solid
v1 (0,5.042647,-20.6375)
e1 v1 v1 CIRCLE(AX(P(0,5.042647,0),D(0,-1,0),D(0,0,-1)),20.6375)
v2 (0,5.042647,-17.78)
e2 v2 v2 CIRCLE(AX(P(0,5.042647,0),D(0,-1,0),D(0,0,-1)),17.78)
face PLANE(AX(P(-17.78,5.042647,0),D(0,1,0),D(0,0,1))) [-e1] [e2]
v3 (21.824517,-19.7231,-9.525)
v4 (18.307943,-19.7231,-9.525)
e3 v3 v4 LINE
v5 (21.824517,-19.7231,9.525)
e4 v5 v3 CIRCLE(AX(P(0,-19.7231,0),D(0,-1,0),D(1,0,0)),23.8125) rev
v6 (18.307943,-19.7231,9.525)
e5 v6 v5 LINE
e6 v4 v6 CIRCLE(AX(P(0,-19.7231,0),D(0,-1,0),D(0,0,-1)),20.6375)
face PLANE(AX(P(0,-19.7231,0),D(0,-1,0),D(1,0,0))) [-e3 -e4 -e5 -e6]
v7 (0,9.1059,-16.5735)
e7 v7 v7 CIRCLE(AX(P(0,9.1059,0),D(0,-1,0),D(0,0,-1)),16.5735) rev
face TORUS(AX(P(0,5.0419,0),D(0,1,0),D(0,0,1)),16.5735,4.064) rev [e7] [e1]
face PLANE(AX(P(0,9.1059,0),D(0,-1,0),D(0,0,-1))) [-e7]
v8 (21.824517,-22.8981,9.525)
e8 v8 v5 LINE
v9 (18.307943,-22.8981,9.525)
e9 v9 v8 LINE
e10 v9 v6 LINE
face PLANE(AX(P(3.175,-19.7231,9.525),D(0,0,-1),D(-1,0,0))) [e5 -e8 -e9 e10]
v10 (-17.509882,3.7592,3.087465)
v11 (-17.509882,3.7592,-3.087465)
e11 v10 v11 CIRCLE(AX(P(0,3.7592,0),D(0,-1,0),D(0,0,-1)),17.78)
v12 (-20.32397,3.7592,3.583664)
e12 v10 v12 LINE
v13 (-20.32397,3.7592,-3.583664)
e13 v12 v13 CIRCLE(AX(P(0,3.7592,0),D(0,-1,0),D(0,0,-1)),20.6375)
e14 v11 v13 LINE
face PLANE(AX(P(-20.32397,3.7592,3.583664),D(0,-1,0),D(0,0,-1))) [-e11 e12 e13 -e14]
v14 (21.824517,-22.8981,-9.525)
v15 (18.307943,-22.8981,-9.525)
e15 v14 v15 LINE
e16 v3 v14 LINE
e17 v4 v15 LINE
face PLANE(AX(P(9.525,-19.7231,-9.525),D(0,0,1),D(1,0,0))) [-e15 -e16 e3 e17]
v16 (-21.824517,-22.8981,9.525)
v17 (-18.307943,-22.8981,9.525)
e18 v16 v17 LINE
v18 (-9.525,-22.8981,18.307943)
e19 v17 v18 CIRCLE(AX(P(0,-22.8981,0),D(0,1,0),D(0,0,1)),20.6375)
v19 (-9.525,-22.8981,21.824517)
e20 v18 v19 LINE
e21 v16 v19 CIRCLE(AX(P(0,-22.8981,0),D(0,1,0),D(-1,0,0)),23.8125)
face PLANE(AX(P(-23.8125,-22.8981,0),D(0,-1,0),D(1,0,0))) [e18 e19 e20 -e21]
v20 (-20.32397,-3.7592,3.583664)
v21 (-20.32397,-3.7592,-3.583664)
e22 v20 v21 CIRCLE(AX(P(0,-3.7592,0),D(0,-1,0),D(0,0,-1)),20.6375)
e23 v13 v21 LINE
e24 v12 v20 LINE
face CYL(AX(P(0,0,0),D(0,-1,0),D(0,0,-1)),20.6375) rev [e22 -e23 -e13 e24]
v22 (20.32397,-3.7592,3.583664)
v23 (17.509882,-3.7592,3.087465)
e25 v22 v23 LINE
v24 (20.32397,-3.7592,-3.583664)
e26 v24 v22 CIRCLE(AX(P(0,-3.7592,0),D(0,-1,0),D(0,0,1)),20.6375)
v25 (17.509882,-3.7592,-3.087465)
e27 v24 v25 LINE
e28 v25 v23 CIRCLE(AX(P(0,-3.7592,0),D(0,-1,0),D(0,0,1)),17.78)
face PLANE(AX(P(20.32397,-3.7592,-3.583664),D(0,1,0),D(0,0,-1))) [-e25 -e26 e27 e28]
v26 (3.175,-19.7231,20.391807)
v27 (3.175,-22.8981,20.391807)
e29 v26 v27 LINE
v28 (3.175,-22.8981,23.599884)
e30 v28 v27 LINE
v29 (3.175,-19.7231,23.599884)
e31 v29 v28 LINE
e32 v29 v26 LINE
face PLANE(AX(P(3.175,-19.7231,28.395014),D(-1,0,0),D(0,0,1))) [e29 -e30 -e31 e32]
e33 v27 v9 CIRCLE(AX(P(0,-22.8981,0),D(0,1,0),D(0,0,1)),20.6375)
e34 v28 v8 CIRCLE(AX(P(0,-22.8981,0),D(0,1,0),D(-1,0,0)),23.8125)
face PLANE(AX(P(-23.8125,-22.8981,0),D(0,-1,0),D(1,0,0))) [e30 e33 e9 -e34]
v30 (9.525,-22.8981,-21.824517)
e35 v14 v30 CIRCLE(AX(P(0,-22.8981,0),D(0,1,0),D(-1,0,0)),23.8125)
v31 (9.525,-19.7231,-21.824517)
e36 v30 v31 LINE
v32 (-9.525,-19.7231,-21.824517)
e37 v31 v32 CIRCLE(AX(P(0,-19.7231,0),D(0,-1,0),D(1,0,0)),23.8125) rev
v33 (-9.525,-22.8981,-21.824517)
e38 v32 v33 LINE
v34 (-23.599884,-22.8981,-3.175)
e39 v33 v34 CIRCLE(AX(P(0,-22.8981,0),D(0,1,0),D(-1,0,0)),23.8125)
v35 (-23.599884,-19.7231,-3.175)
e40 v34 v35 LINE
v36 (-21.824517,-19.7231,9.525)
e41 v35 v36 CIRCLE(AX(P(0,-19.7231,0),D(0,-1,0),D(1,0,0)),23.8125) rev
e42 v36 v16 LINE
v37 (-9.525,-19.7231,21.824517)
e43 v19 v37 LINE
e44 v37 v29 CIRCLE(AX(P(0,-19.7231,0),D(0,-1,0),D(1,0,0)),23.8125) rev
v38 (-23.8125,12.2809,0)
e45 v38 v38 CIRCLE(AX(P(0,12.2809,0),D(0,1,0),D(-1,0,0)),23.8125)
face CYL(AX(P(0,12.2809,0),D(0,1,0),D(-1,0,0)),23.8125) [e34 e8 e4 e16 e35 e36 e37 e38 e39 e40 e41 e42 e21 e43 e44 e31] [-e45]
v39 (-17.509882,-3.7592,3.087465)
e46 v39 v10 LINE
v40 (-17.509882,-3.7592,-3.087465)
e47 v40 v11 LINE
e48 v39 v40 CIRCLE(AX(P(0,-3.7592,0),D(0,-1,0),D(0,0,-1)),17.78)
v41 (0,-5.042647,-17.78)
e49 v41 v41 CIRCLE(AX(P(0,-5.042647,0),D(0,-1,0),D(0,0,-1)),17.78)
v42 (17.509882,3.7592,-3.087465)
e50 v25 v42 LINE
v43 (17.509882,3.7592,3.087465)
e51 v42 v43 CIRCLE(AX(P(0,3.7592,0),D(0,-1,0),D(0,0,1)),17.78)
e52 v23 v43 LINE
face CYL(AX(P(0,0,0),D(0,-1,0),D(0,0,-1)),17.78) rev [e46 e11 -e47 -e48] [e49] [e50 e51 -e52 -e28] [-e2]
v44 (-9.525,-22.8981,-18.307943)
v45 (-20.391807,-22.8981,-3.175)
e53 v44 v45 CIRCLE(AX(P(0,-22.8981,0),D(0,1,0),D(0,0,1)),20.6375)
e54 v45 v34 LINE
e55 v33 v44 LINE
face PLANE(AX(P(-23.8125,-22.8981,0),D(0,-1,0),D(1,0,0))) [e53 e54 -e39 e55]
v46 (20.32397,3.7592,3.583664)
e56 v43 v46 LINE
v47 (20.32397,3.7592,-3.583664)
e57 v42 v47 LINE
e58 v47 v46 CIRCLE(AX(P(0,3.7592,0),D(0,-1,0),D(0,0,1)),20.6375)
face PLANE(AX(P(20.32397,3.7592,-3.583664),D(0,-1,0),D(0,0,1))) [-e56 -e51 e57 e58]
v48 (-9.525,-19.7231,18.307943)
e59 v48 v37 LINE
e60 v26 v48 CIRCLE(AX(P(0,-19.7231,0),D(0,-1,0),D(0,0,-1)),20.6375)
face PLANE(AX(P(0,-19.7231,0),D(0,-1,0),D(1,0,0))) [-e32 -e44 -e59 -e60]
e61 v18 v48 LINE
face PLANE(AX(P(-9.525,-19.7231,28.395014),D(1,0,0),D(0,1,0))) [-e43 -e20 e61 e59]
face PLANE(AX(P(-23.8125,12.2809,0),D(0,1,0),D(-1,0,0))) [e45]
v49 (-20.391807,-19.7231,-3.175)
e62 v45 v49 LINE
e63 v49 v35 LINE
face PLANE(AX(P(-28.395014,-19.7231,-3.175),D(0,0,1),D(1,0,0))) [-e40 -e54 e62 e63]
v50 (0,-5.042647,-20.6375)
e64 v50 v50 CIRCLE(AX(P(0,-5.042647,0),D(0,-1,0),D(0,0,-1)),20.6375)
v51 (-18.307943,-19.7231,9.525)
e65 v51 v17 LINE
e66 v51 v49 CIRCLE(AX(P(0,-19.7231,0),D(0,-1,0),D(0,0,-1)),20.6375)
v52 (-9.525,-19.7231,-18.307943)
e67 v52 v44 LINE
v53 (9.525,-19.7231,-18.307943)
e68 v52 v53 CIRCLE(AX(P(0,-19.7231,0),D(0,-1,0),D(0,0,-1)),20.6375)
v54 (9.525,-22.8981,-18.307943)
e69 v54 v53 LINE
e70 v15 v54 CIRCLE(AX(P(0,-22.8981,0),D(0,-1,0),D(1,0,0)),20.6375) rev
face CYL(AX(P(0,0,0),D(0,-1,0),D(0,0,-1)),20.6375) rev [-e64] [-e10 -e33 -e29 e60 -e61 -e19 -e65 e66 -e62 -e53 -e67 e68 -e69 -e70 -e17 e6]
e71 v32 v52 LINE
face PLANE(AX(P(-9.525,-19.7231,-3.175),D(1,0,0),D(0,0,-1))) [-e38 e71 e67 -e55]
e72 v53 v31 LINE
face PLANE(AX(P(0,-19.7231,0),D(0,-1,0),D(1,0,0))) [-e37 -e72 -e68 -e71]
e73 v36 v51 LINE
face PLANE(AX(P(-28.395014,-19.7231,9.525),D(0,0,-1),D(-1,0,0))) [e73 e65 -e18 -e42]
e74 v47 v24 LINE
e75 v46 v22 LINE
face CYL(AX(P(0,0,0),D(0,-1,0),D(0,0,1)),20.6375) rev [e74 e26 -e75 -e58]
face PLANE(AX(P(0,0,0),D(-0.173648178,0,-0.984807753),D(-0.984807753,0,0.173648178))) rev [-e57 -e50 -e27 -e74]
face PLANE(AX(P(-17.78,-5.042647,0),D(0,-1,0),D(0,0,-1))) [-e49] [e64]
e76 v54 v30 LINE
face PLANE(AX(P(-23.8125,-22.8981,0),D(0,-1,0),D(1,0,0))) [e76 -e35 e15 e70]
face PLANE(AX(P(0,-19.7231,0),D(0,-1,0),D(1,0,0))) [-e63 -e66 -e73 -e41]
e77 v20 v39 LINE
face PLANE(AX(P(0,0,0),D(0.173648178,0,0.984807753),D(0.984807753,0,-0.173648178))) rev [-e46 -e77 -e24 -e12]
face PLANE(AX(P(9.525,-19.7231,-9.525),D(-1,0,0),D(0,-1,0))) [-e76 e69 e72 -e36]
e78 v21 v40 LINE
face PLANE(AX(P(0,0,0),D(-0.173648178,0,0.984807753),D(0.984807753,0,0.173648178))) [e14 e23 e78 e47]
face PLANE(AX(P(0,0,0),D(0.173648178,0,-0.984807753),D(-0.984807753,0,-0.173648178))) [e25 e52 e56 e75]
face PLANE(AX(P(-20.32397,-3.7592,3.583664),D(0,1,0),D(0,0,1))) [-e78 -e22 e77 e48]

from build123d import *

# Parameters (mm, degrees)
FILLET1_R            = 4.064
SKETCH10_W           = 2.857500069
SKETCH10_H           = 7.5184
REVOLVE3_ANGLE       = 20
CUT_EXTRUDE1_START   = 1.27
CUT_EXTRUDE1_DEPTH   = 4.9784
CIRPATTERN4_COUNT    = 2
FILLET8_R            = 1.27
FILLET9_R            = 1.27
SKETCH13_W           = 23.8125
SKETCH13_H           = 35.179
SKETCH14_OUTSIDE_W   = 64.822
SKETCH14_OUTSIDE_H   = 64.822
SKETCH14_OUTSIDE_W_2 = 18.870013955
SKETCH14_OUTSIDE_H_2 = 18.870013955
SKETCH14_OUTSIDE_W_3 = 25.220013955
SKETCH14_OUTSIDE_H_3 = 25.220013955
CUT_EXTRUDE2_DEPTH   = 3.175


with BuildPart() as part:
    # Sketch1 → Revolve1 (revolve)
    with BuildSketch(Plane.XY, mode=Mode.PRIVATE) as revolve1_sk:
        Polygon((0, 9.1059), (-20.6375, 9.1059), (-20.6375, 5.042647059), (-17.78, 5.042647059), (-17.78, -5.042647059), (-20.6375, -5.042647059), (-20.6375, -19.7231), (-16.51, -19.7231), (-16.51, -15.5956), (-18.0975, -15.5956), (-18.0975, -13.3096), (-16.51, -13.3096), (-16.51, 6.7564), (-3.8481, 6.7564), (-3.0861, 7.5184), (0, 7.5184), align=None)
    revolve(revolve1_sk.sketch.rotate(Axis((0, 0, 0), (0, 1, 0)), 270), axis=Axis((0, 0, 0), (0, 1, 0)))

    # Fillet1
    # the kernel refuses this fillet: 4.064 mm, written as the material it takes off along each edge
    with BuildSketch(Plane(origin=(0, 9.1059, 0), x_dir=(0, 0, -1), z_dir=(1, 0, 0))) as fillet1_piece_1:
        with BuildLine():
            CenterArc((16.573500069, -4.064), FILLET1_R, 0.010532312, 89.989467688)
            Line((20.6375, -4.063252941), (20.718779999, -4.063238))
            Line((20.718779999, -4.063238), (20.71878, 0))
            Line((20.71878, 0), (20.6375, 0.08128))
            Line((20.6375, 0.08128), (16.573500069, 0.08128))
            Line((16.573500069, 0.08128), (16.573500069, 0))
        make_face()
    revolve(axis=Axis((0, 9.1059, 0), (0, 1, 0)), mode=Mode.SUBTRACT)

    # Sketch10 → Revolve3 (revolve, symmetric)
    with BuildSketch(Plane.XY) as revolve3_sk:
        with Locations((-19.208750034, 0)):
            Rectangle(SKETCH10_W, SKETCH10_H)
    revolve3 = revolve(axis=Axis((0, 0, 0), (0, 1, 0)), revolution_arc=REVOLVE3_ANGLE / 2)
    revolve3 = revolve3 + revolve(revolve3_sk.sketch, axis=Axis((0, 0, 0), (0, -1, 0)), revolution_arc=REVOLVE3_ANGLE / 2)

    # Sketch12 → Cut-Extrude1 (cut)
    with BuildSketch(Plane(origin=(0, -3.7592, 0), x_dir=(1, 0, 0), z_dir=(0, 1, 0)).offset(CUT_EXTRUDE1_START)):
        with BuildLine():
            Line((-7.313638514, 0), (-17.215440903, 1.745954919))
            ThreePointArc((-17.215440903, 1.745954919), (-17.30375, 0), (-17.215440903, -1.745954919))
            Line((-17.215440903, -1.745954919), (-7.313638514, 0))
        make_face()
    cut_extrude1 = extrude(amount=CUT_EXTRUDE1_DEPTH, mode=Mode.SUBTRACT)

    # CirPattern4: Revolve3, Cut-Extrude1 ×2 about axis
    cirpattern4_axis = Axis((0, 0, 0), (0, 1, 0))
    add([revolve3.rotate(cirpattern4_axis, i * 360 / CIRPATTERN4_COUNT) for i in range(1, CIRPATTERN4_COUNT)])
    add([cut_extrude1.rotate(cirpattern4_axis, i * 360 / CIRPATTERN4_COUNT) for i in range(1, CIRPATTERN4_COUNT)], mode=Mode.SUBTRACT)

    # Fillet8
    # the kernel refuses this fillet: 1.27 mm, written as the material it takes off along each edge
    with BuildSketch(Plane(origin=(-16.431533746, -2.4892, -1.607730937), x_dir=(0.1324793231915166, 0, -0.9911857691304479), z_dir=(0, 1, 0)), Plane(origin=(16.431533746, -2.4892, 1.607730937), x_dir=(-0.13247932319151873, 0, 0.9911857691304475), z_dir=(0, 1, 0))) as fillet8_piece_1:
        with BuildLine():
            CenterArc((1.211424462, 1.269207194), FILLET8_R, 201.909884157, 66.065503548)
            Line((0.033154154, 0.795309438), (0.009588748, 0.785831483))
            ThreePointArc((0.009588748, 0.785831483), (-0.008800881, 0.398712653), (-0.025377958, 0.001057934))
            Line((-0.025377958, 0.001057934), (0.000897351, -0.025384144))
            ThreePointArc((0.000897351, -0.025384144), (0.583278445, -0.01509352), (1.165659538, -0.025384144))
            Line((1.165659538, -0.025384144), (1.166556889, 0))
        make_face()
    extrude(amount=4.9784, mode=Mode.SUBTRACT)
    with BuildSketch(Plane(origin=(-16.431533746, -2.4892, 1.607730937), x_dir=(0.13247932319152245, 0, 0.9911857691304472), z_dir=(0, 1, 0)), Plane(origin=(16.431533746, -2.4892, -1.607730937), x_dir=(-0.13247932319151992, 0, -0.9911857691304475), z_dir=(0, 1, 0))) as fillet8_piece_2:
        with BuildLine():
            CenterArc((1.211424462, -1.269207194), FILLET8_R, 92.024612295, 66.065503548)
            Line((0.033154154, -0.795309438), (0.009588748, -0.785831483))
            ThreePointArc((0.009588748, -0.785831483), (-0.008800881, -0.398712653), (-0.025377958, -0.001057934))
            Line((-0.025377958, -0.001057934), (0.000897351, 0.025384144))
            ThreePointArc((0.000897351, 0.025384144), (0.583278445, 0.01509352), (1.165659538, 0.025384144))
            Line((1.165659538, 0.025384144), (1.166556889, 0))
        make_face()
    extrude(amount=4.9784, mode=Mode.SUBTRACT)

    # Fillet9
    fillet9_edges = [part.edges().sort_by_distance(p)[0] for p in [
        (-17.215440903, 0, 1.745954919),
        (-17.215440903, 0, -1.745954919),
        (17.215440903, 0, -1.745954919),
        (17.215440903, 0, 1.745954919),
    ]]
    fillet(fillet9_edges, radius=FILLET9_R)


with BuildPart() as body_2:
    # Sketch13 → Revolve4 (revolve)
    with BuildSketch(Plane.XY):
        with Locations((-11.90625, -5.3086)):
            Rectangle(SKETCH13_W, SKETCH13_H)
    revolve(axis=Axis((0, 12.2809, 0), (0, -1, 0)))

    # Intersect1: read off the stored shape, not the designer's step
    # Intersect1: cut part
    add(part.part, mode=Mode.SUBTRACT)

    # Sketch14 outside → Cut-Extrude2 (cut)
    with BuildSketch(Plane.XZ.offset(22.8981)):
        Rectangle(SKETCH14_OUTSIDE_W, SKETCH14_OUTSIDE_H)
        with Locations((-18.960006978, 18.960006978)):
            Rectangle(SKETCH14_OUTSIDE_W_2, SKETCH14_OUTSIDE_H_2, mode=Mode.SUBTRACT)
        with Locations((15.785006978, 18.960006978)):
            Rectangle(SKETCH14_OUTSIDE_W_3, SKETCH14_OUTSIDE_H_2, mode=Mode.SUBTRACT)
        with Locations((-18.960006978, -15.785006978)):
            Rectangle(SKETCH14_OUTSIDE_W_2, SKETCH14_OUTSIDE_H_3, mode=Mode.SUBTRACT)
        with Locations((18.960006978, -18.960006978)):
            Rectangle(SKETCH14_OUTSIDE_W_2, SKETCH14_OUTSIDE_H_2, mode=Mode.SUBTRACT)
    extrude(amount=-CUT_EXTRUDE2_DEPTH, mode=Mode.SUBTRACT)

    # Sketch15 → Cut-Revolve5 (revolve, cut)
    with BuildSketch(Plane.XY):
        Polygon((0, -22.8981), (20.6375, -22.8981), (20.6375, -19.7231), (17.504044696, -19.7231), (17.504044696, -16.22202595), (19.900999595, -16.22202595), (19.900999595, -12.241789307), (17.504044696, -12.241789307), (17.504044696, 7.5184), (0, 7.5184), align=None)
    revolve(axis=Axis((0, 0, 0), (0, -1, 0)), mode=Mode.SUBTRACT)


solid = body_2.part
